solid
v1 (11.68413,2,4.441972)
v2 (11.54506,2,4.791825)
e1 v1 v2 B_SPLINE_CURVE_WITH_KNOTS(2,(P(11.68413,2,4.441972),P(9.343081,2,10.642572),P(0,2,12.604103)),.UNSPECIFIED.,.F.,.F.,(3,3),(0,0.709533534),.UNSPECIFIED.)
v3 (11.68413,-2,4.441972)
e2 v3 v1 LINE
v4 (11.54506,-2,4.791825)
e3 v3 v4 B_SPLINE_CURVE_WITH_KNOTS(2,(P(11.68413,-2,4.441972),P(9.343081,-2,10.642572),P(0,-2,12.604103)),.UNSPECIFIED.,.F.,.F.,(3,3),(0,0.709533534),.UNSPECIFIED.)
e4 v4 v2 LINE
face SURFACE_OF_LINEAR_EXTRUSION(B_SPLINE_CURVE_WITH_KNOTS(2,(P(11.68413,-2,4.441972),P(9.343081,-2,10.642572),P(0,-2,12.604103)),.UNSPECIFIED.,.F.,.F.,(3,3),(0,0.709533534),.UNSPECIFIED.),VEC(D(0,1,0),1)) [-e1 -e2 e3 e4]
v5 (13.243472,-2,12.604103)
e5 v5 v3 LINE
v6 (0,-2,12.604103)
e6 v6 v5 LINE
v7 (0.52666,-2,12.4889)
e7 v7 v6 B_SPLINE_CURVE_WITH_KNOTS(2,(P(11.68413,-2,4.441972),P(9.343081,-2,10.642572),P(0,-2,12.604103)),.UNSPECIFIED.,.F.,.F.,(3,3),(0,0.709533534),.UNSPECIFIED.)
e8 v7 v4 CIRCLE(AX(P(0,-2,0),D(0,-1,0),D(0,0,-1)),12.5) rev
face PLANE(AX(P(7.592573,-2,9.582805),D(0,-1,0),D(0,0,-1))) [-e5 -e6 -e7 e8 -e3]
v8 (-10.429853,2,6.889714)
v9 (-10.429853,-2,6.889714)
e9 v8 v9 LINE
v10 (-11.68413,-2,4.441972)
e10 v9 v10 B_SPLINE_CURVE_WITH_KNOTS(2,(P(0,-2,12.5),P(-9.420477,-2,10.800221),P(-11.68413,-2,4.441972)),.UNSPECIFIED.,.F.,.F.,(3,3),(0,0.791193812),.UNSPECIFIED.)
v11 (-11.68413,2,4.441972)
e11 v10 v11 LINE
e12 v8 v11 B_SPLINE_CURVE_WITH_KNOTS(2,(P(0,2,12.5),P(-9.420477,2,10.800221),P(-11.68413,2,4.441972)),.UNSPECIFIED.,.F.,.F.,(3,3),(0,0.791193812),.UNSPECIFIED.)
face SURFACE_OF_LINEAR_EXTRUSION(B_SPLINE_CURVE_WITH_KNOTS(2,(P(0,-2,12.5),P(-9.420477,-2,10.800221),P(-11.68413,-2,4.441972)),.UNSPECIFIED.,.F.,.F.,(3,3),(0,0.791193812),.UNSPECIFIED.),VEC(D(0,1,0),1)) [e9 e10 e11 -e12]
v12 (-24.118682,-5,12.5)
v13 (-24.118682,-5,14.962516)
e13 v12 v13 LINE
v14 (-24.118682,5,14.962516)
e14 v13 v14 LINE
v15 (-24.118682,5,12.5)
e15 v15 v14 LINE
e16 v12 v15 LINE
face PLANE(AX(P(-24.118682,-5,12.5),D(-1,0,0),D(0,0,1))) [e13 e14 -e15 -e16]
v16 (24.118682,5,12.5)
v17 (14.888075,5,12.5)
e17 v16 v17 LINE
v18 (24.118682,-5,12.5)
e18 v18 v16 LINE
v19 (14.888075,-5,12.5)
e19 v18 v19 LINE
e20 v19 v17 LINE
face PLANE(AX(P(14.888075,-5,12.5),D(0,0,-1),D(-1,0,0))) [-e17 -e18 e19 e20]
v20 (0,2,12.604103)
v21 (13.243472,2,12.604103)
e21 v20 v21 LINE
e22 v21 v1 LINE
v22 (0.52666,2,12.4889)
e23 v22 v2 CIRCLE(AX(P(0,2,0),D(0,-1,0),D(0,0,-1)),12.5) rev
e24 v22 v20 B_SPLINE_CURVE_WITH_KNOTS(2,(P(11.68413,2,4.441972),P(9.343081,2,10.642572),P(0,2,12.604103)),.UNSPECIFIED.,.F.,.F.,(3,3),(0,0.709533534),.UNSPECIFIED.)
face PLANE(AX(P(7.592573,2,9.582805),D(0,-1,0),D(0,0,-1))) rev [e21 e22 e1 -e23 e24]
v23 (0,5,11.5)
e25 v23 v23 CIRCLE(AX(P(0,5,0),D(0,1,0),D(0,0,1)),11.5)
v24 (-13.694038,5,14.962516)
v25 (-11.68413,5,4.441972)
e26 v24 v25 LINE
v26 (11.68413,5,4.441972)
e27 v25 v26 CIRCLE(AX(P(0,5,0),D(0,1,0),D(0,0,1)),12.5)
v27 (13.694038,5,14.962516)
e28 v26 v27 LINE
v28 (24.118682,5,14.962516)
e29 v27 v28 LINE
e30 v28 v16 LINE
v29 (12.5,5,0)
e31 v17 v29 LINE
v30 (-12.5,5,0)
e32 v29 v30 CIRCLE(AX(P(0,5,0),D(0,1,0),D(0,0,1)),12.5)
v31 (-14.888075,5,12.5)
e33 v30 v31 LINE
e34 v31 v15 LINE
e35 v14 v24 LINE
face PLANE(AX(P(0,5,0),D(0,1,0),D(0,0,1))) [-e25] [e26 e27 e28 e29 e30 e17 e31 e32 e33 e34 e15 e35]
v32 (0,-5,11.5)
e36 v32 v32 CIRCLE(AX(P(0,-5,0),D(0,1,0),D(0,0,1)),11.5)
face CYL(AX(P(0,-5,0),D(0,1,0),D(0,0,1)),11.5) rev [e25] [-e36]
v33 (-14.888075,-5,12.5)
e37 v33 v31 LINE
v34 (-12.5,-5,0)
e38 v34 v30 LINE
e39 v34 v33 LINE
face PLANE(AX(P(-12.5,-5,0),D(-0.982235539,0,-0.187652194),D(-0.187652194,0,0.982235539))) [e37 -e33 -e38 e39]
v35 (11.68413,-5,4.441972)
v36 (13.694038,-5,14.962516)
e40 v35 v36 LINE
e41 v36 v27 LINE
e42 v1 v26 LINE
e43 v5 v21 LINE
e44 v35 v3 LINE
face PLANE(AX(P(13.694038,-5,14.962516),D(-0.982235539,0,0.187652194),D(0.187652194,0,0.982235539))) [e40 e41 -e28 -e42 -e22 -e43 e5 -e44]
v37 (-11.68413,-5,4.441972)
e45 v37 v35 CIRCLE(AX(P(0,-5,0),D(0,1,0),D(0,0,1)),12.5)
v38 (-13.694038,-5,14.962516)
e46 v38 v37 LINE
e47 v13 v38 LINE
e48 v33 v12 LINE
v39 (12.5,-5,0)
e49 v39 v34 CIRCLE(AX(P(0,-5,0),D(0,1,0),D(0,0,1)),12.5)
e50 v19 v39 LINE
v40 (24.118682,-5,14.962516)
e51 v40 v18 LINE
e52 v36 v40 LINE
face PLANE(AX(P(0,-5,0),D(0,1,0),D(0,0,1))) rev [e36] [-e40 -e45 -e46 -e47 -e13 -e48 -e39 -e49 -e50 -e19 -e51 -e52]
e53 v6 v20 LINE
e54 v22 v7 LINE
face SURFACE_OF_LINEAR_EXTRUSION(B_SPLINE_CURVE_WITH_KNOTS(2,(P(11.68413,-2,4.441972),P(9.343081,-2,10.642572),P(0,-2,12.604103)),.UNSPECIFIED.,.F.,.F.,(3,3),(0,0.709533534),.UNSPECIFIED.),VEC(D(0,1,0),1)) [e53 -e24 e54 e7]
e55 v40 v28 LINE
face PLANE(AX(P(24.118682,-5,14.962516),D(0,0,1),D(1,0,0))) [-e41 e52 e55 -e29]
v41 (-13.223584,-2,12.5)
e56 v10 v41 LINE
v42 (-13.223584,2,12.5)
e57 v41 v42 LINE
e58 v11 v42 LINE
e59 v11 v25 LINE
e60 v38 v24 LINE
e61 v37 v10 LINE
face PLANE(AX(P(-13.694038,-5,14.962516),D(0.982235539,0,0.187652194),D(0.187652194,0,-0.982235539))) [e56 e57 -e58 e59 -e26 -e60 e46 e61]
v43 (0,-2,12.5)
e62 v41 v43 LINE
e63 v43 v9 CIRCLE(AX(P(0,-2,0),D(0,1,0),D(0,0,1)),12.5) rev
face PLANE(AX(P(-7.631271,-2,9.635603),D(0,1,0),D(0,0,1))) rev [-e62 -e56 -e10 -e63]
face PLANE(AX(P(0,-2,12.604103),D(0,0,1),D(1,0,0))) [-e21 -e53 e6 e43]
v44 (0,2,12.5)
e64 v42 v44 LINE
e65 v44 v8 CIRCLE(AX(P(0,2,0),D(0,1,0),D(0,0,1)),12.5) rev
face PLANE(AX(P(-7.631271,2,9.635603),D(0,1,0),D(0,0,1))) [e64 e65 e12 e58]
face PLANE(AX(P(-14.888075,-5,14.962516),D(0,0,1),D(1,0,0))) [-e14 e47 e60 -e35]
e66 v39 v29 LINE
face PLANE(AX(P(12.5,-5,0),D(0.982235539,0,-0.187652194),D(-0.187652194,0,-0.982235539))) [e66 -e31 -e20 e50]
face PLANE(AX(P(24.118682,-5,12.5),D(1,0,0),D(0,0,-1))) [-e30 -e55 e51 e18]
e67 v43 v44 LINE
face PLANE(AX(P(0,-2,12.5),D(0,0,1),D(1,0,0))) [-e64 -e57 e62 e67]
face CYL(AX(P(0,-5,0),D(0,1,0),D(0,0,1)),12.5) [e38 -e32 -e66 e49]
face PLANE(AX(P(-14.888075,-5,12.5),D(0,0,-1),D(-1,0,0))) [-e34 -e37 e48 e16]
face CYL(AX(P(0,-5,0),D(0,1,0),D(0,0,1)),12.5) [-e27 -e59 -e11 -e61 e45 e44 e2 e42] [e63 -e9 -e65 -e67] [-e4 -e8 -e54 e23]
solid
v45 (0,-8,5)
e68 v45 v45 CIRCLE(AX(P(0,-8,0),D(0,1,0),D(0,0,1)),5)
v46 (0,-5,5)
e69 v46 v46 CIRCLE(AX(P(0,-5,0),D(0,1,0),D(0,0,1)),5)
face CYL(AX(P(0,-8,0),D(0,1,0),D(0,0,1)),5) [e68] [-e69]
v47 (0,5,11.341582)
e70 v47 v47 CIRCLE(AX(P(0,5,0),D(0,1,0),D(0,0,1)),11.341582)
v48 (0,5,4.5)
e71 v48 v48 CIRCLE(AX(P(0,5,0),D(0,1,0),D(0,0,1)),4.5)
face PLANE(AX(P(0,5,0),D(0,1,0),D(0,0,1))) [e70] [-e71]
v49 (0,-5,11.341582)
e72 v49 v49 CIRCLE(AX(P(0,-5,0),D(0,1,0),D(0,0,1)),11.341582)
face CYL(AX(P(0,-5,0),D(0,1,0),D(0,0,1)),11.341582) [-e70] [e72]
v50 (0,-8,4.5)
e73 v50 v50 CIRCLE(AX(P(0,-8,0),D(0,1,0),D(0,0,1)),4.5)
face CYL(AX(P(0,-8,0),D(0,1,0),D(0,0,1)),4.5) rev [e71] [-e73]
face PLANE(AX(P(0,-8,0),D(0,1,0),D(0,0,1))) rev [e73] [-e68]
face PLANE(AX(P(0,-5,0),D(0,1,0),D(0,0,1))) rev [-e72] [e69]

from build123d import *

# Parameters (mm, degrees)
BOSS_EXTRUDE1_DEPTH      = 5
BOSS_EXTRUDE1_DEPTH_BACK = 5
SKETCH1_R                = 11.5
BOSS_EXTRUDE2_START      = -2
BOSS_EXTRUDE2_DEPTH      = 4
BOSS_EXTRUDE3_DEPTH      = 2
BOSS_EXTRUDE3_DEPTH_BACK = 2
BOSS_EXTRUDE4_DEPTH      = 5
BOSS_EXTRUDE4_DEPTH_BACK = 5
SKETCH5_R                = 11.341581645
SKETCH5_R_2              = 10.881998828
BOSS_EXTRUDE5_DEPTH      = 5
BOSS_EXTRUDE5_DEPTH_BACK = 5
SKETCH6_R                = 10.881998828
SKETCH6_R_2              = 5
BOSS_EXTRUDE6_DEPTH      = 5
BOSS_EXTRUDE6_DEPTH_BACK = 8
SKETCH7_R                = 5
SKETCH7_R_2              = 4.5


# Read off the part's stored shape, not the designer's step: Boss-Extrude2
with BuildPart() as part:
    # Sketch1 → Boss-Extrude1 (new, two sides: drawn at the far end of the back side and taken through both)
    with BuildSketch(Plane(origin=(0, 0, 0), x_dir=(1, 0, 0), z_dir=(0, 1, 0)).offset(-BOSS_EXTRUDE1_DEPTH_BACK)):
        with BuildLine():
            Line((-12.5, 0), (-14.888075294, -12.5))
            Line((-14.888075294, -12.5), (-24.118681977, -12.5))
            Line((-24.118681977, -12.5), (-24.118681977, -14.962515671))
            Line((-24.118681977, -14.962515671), (-14.888075294, -14.962515671))
            Line((-14.888075294, -14.962515671), (-13.694037647, -14.962515671))
            Line((-13.694037647, -14.962515671), (-11.684129612, -4.441971995))
            ThreePointArc((-11.684129612, -4.441971995), (0, -12.5), (11.684129612, -4.441971995))
            Line((11.684129612, -4.441971995), (13.694037647, -14.962515671))
            Line((13.694037647, -14.962515671), (14.888075294, -14.962515671))
            Line((14.888075294, -14.962515671), (24.118681977, -14.962515671))
            Line((24.118681977, -14.962515671), (24.118681977, -12.5))
            Line((24.118681977, -12.5), (14.888075294, -12.5))
            Line((14.888075294, -12.5), (12.5, 0))
            ThreePointArc((12.5, 0), (0, 12.5), (-12.5, 0))
        make_face()
        with Locations(Location((0, 0, 0), (0, 0, 270))):
            Circle(SKETCH1_R, mode=Mode.SUBTRACT)
    extrude(amount=BOSS_EXTRUDE1_DEPTH + BOSS_EXTRUDE1_DEPTH_BACK)

    # Boss-Extrude2 outline → Boss-Extrude2 (add)
    with BuildSketch(Plane(origin=(0, 0, 0), x_dir=(1, 0, 0), z_dir=(0, 1, 0)).offset(BOSS_EXTRUDE2_START)):
        with BuildLine():
            ThreePointArc((11.545060202, -4.7918248), (7.158411272, -10.247299549), (0.526660373, -12.488900226))
            add(Edge.make_bspline(
                [(0.526660373, -12.488900226), (0.266171619, -12.548222015), (0, -12.604103366)],
                knots=[0.689319893, 0.689319893, 0.689319893, 0.709533534, 0.709533534, 0.709533534], degree=2))
            Line((0, -12.604103366), (13.243472354, -12.604103366))
            Line((13.243472354, -12.604103366), (11.684129612, -4.441971995))
            add(Edge.make_bspline(
                [(11.684129612, -4.441971995), (11.61743634, -4.618618616), (11.545060202, -4.7918248)],
                knots=[0, 0, 0, 0.020213641, 0.020213641, 0.020213641], degree=2))
        make_face()
    extrude(amount=BOSS_EXTRUDE2_DEPTH)

    # Sketch4 → Boss-Extrude3 (add, two sides: drawn at the far end of the back side and taken through both)
    with BuildSketch(Plane(origin=(0, 0, 0), x_dir=(1, 0, 0), z_dir=(0, 1, 0)).offset(-BOSS_EXTRUDE3_DEPTH_BACK)):
        with BuildLine():
            Line((0, -12.5), (-13.22358382, -12.5))
            Line((-13.22358382, -12.5), (-11.684129612, -4.441971995))
            add(Edge.make_bspline(
                [(0, -12.5), (-9.420476938, -10.800220507), (-11.684129612, -4.441971995)],
                knots=[0, 0, 0, 0.791193812, 0.791193812, 0.791193812], degree=2))
        make_face()
    extrude(amount=BOSS_EXTRUDE3_DEPTH + BOSS_EXTRUDE3_DEPTH_BACK)


with BuildPart() as body_2:
    # Sketch5 → Boss-Extrude4 (new, two sides: drawn at the far end of the back side and taken through both)
    with BuildSketch(Plane(origin=(0, 0, 0), x_dir=(1, 0, 0), z_dir=(0, 1, 0)).offset(-BOSS_EXTRUDE4_DEPTH_BACK)):
        with Locations(Location((0, 0, 0), (0, 0, 270))):
            Circle(SKETCH5_R)
        with Locations(Location((0, 0, 0), (0, 0, 270))):
            Circle(SKETCH5_R_2, mode=Mode.SUBTRACT)
    extrude(amount=BOSS_EXTRUDE4_DEPTH + BOSS_EXTRUDE4_DEPTH_BACK)



with BuildPart() as body_3:
    # Sketch6 → Boss-Extrude5 (new, two sides: drawn at the far end of the back side and taken through both)
    with BuildSketch(Plane(origin=(0, 0, 0), x_dir=(1, 0, 0), z_dir=(0, 1, 0)).offset(-BOSS_EXTRUDE5_DEPTH_BACK)):
        with Locations(Location((0, 0, 0), (0, 0, 270))):
            Circle(SKETCH6_R)
        with Locations(Location((0, 0, 0), (0, 0, 270))):
            Circle(SKETCH6_R_2, mode=Mode.SUBTRACT)
    extrude(amount=BOSS_EXTRUDE5_DEPTH + BOSS_EXTRUDE5_DEPTH_BACK)


with BuildPart() as body_2_1:
    add(body_2.part)

    add(body_3.part)  # Boss-Extrude6 merges body 3
    # Sketch7 → Boss-Extrude6 (add, two sides: drawn at the far end of the back side and taken through both)
    with BuildSketch(Plane(origin=(0, 0, 0), x_dir=(1, 0, 0), z_dir=(0, 1, 0)).offset(-BOSS_EXTRUDE6_DEPTH_BACK)):
        with Locations(Location((0, 0, 0), (0, 0, 270))):
            Circle(SKETCH7_R)
        with Locations(Location((0, 0, 0), (0, 0, 270))):
            Circle(SKETCH7_R_2, mode=Mode.SUBTRACT)
    extrude(amount=BOSS_EXTRUDE6_DEPTH + BOSS_EXTRUDE6_DEPTH_BACK)


solid = Compound([part.part, body_2_1.part])
